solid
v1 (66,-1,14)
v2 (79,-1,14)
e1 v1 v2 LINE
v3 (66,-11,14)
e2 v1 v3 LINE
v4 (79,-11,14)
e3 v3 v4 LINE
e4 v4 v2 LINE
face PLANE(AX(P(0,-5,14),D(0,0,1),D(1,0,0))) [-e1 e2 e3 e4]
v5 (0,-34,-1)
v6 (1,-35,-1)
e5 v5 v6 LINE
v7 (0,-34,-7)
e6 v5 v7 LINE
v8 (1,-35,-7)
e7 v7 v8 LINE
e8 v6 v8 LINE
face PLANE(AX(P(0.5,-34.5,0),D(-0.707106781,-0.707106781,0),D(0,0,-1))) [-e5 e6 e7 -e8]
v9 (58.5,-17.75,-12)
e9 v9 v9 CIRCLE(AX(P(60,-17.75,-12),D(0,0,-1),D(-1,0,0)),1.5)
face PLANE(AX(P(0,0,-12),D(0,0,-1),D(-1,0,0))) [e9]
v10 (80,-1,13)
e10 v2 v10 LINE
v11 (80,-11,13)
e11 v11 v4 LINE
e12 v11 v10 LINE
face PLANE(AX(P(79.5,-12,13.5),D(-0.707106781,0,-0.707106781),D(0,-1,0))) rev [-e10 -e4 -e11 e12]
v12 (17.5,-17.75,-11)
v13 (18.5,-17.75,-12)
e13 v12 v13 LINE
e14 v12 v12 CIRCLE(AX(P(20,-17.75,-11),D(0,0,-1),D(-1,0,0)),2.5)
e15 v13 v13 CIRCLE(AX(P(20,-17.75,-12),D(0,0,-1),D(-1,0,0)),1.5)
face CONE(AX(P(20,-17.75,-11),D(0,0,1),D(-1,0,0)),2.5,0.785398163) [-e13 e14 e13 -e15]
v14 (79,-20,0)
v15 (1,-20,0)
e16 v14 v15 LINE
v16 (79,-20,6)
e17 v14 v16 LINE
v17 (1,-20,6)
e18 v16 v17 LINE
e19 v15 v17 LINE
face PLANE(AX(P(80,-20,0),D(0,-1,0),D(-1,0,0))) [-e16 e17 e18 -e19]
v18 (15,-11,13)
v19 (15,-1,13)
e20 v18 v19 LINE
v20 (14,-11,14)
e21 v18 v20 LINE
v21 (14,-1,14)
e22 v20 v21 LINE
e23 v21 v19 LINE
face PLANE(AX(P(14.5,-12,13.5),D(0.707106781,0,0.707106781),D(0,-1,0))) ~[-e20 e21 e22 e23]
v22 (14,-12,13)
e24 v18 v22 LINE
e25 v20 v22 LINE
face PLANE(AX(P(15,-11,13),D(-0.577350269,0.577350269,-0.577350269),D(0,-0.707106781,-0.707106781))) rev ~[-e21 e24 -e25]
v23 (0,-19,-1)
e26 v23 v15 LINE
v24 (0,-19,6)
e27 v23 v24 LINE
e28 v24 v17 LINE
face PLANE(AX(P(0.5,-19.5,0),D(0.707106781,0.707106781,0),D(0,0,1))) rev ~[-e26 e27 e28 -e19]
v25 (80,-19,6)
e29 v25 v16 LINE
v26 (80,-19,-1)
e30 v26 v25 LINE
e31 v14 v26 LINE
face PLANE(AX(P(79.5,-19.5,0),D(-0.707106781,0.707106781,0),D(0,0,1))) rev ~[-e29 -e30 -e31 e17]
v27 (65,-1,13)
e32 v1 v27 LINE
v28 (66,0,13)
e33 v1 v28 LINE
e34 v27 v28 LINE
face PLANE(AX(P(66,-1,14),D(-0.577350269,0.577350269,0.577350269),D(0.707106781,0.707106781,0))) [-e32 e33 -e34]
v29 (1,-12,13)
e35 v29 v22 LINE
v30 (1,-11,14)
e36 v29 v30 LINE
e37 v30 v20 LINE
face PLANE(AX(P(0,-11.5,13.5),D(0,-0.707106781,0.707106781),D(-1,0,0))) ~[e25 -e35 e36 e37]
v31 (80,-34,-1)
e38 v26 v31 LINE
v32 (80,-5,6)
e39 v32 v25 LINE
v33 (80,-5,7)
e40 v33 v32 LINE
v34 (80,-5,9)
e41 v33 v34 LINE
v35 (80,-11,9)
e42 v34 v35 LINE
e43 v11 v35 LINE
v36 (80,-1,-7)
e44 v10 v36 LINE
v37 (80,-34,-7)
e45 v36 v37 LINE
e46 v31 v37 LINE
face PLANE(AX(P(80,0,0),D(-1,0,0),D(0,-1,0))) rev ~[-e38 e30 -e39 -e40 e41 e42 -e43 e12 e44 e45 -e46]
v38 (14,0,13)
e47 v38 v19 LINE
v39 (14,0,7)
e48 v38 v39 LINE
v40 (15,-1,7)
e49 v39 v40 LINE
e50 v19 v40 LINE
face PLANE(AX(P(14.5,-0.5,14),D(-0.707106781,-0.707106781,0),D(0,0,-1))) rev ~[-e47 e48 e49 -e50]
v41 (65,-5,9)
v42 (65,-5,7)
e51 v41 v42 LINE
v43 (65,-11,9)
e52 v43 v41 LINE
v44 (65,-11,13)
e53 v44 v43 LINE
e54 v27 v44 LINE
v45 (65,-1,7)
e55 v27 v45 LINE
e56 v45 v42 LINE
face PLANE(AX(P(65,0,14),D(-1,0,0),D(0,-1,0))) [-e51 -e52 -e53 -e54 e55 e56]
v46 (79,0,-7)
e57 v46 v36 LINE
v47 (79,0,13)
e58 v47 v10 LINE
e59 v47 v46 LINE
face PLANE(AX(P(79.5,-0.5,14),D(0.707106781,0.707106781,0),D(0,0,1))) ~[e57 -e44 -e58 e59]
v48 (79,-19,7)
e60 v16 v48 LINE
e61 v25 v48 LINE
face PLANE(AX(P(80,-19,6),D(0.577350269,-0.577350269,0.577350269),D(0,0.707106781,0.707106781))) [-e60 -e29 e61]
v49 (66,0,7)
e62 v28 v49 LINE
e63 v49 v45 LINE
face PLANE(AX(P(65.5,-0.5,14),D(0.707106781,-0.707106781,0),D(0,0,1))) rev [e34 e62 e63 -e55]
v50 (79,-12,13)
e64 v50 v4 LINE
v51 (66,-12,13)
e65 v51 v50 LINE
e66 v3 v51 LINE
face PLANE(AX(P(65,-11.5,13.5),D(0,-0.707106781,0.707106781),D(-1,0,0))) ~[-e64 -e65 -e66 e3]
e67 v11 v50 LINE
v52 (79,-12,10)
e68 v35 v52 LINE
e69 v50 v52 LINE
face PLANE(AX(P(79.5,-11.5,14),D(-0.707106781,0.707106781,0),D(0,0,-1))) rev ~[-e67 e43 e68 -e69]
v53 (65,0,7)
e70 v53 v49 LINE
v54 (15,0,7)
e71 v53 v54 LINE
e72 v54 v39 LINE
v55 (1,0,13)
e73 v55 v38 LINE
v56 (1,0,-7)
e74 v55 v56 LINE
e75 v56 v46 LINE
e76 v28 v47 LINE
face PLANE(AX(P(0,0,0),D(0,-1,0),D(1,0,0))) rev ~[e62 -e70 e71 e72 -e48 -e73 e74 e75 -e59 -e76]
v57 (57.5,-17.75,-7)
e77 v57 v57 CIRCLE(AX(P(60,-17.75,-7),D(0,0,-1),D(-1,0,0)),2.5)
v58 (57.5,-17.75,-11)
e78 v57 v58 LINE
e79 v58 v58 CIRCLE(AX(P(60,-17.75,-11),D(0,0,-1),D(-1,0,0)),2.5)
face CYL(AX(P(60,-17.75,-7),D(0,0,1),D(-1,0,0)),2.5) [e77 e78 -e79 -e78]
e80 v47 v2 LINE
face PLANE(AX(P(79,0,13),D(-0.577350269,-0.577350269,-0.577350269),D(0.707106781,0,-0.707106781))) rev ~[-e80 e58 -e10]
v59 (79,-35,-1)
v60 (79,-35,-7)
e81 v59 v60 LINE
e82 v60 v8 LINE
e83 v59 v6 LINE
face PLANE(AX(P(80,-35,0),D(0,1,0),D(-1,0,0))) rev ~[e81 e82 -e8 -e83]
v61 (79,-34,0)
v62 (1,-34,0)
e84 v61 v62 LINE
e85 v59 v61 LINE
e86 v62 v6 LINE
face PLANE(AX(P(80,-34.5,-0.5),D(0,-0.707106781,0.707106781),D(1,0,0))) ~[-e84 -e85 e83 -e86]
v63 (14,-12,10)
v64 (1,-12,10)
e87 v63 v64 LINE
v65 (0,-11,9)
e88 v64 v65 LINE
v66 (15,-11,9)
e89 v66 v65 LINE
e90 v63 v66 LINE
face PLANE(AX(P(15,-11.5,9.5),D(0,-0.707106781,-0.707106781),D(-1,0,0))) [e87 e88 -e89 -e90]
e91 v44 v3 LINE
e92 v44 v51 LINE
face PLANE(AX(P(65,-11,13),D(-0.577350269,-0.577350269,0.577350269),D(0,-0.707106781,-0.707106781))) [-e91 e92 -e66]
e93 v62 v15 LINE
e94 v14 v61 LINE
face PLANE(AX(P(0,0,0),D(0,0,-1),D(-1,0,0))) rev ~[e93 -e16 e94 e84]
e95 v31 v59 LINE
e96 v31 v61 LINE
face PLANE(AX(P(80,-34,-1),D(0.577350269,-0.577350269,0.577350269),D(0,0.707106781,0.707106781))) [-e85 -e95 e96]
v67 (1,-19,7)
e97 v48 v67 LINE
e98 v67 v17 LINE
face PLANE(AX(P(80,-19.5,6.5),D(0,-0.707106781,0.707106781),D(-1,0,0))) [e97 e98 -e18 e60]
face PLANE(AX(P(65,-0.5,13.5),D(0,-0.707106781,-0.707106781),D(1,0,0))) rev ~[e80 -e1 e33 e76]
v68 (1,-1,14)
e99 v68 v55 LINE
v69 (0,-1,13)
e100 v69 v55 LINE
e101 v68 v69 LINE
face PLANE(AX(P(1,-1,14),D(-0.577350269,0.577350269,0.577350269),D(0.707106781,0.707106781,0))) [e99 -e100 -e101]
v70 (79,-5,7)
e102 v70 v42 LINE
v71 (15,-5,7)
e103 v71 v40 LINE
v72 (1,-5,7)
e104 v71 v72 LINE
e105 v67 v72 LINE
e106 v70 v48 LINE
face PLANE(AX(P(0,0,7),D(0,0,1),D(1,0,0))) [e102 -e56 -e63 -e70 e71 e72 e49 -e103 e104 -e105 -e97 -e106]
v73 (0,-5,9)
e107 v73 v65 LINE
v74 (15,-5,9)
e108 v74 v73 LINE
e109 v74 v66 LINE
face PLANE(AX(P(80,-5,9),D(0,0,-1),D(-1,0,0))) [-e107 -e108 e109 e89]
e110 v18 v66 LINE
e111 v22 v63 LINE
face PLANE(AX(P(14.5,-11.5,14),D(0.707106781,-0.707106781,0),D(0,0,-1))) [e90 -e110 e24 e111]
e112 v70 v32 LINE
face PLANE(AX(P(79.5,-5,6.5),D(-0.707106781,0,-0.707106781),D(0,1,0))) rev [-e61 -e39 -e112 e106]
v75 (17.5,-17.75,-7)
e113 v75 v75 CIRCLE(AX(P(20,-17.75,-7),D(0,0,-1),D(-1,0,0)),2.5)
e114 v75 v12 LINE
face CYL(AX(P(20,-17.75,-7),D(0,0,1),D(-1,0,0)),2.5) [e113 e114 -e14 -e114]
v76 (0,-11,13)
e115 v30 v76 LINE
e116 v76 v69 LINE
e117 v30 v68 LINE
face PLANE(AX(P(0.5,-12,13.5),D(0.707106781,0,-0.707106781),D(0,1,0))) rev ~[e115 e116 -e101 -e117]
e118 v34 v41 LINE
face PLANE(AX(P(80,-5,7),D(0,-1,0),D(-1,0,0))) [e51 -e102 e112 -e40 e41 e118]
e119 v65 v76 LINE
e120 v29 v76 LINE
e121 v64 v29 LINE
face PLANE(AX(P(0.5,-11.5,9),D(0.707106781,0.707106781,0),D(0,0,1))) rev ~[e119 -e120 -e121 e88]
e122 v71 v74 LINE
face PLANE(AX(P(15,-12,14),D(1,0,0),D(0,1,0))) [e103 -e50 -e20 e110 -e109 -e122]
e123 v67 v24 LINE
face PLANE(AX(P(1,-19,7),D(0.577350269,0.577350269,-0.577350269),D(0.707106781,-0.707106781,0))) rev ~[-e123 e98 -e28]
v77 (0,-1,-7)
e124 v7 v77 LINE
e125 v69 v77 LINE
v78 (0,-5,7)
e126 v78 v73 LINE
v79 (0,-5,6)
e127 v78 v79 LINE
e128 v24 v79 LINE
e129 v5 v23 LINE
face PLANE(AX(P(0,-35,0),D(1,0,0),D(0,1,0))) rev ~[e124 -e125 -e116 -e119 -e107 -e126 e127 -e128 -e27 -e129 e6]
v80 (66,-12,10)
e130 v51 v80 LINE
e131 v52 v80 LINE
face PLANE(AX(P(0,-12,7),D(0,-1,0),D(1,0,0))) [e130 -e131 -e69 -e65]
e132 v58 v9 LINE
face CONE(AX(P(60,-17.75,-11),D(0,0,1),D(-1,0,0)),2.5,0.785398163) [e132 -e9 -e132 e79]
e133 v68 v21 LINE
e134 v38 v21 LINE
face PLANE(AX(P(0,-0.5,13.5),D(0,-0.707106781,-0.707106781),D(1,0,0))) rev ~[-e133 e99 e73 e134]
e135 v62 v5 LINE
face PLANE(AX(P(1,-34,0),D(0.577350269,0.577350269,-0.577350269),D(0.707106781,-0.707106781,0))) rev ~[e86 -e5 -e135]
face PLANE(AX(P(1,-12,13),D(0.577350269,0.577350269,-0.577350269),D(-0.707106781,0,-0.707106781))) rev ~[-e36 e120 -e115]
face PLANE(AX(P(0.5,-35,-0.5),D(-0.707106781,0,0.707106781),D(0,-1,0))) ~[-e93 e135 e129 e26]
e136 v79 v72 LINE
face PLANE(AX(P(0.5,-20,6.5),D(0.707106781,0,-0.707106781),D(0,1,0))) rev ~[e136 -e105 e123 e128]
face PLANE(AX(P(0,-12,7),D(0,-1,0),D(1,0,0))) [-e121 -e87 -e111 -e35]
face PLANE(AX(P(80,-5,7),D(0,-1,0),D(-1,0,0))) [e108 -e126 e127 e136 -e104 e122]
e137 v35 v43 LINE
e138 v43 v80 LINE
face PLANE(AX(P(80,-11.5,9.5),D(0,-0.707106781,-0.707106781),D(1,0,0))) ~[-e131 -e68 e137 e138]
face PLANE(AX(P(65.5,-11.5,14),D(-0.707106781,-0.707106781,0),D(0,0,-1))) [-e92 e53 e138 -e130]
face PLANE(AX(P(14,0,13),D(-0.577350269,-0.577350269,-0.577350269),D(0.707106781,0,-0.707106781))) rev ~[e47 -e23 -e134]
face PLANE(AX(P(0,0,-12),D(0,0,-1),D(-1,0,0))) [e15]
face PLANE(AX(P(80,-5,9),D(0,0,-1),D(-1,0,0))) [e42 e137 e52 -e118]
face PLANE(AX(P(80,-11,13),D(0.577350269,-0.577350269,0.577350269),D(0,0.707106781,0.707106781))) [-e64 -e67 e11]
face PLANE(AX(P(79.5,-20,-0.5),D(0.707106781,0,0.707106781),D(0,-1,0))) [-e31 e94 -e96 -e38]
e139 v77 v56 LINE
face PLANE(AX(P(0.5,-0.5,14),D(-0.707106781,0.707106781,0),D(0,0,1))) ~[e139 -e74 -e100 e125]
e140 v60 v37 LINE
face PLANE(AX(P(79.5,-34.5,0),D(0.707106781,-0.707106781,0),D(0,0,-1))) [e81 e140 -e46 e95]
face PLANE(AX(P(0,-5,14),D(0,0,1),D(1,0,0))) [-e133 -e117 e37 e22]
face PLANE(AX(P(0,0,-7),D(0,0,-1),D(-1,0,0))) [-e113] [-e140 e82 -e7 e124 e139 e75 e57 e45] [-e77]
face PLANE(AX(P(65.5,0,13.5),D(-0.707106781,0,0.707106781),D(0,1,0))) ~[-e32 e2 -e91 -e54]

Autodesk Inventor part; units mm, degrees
ref_plane "YZ Plane" through (0, 0, 0) normal (1, 0, 0) x (0, 1, 0)
ref_plane "XZ Plane" through (0, 0, 0) normal (0, 1, 0) x (-1, 0, 0)
ref_plane "XY Plane" through (0, 0, 0) normal (0, 0, 1) x (1, 0, 0)
sketch "Sketch1" plane through (0, 0, 0) normal (0, 0, 1) x (1, 0, 0)
  line L0 (0, 0) -> (80, 0)
  line L1 (80, 0) -> (80, -20)
  line L2 (80, -20) -> (0, -20)
  line L3 (0, -20) -> (0, 0)
  dimension "d0" = 80
  dimension "d1" = 20
extrude "Extrusion1" add sketch "Sketch1" along normal blind 7
sketch "Sketch2" plane through (0, 0, 7) normal (0, 0, 1) x (1, 0, 0)
  line L0 (0, 0) -> (80, 0)
  line L1 (80, 0) -> (80, -5)
  line L2 (80, -5) -> (0, -5)
  line L3 (0, -5) -> (0, 0)
  dimension "d4" = 80
  dimension "d5" = 5
extrude "Extrusion2" add sketch "Sketch2" along normal blind 7
sketch "Sketch3" plane through (0, -5, 7) normal (0, -1, 0) x (1, 0, 0)
  line L0 (0, -7) -> (0, 7) projected
  line L1 (0, 7) -> (80, 7)
  line L2 (80, 7) -> (80, 2)
  line L3 (80, 2) -> (0, 2)
  line L4 (0, 2) -> (0, 7)
  dimension "d8" = 80
  dimension "d9" = 5
extrude "Extrusion3" add sketch "Sketch3" along normal blind 7
sketch "Sketch6" plane through (0, 0, 14) normal (0, 0, 1) x (1, 0, 0)
  line L0 (80, 0) -> (0, 0) projected
  line L1 (1, -12) -> (79, -12) projected
  line L2 (15, 0) -> (65, 0)
  line L3 (65, 0) -> (65, -12)
  line L4 (65, -12) -> (15, -12)
  line L5 (15, -12) -> (15, 0)
  line L6 (0, -1) -> (0, -11) projected
  point P0 (79, 0)
  point P1 (1, 0)
  dimension "d28" = 50
  dimension "d29" = 15
extrude "Extrusion6" cut sketch "Sketch6" against normal blind 7
sketch "Sketch7" plane through (0, 0, 0) normal (0, 0, -1) x (-1, 0, 0)
  line L0 (0, 0) -> (-80, 0)
  line L1 (-80, 0) -> (-80, -35)
  line L2 (-80, -35) -> (0, -35)
  line L3 (0, -35) -> (0, 0)
  dimension "d38" = 80
  dimension "d39" = 35
extrude "Extrusion7" add sketch "Sketch7" along normal blind 7
sketch "Sketch8" plane through (0, 0, -7) normal (0, 0, -1) x (-1, 0, 0)
  circle A0 centre (-20, -17.75) radius 2.5
  line L0 (0, 0) -> (-80, 0) projected
  line L1 (0, -35) -> (0, 0) projected
  dimension "d42" = 5
  dimension "d43" = 17.75
  dimension "d44" = 20
extrude "Extrusion8" add sketch "Sketch8" along normal blind 5
sketch "Sketch9" plane through (0, 0, -7) normal (0, 0, -1) x (-1, 0, 0)
  circle A0 centre (-60, -17.75) radius 2.5
  line L0 (0, 0) -> (-80, 0) projected
  line L1 (-80, 0) -> (-80, -35) projected
  dimension "d47" = 5
  dimension "d48" = 17.75
  dimension "d49" = 20
extrude "Extrusion9" add sketch "Sketch9" along normal blind 5
chamfer "Chamfer5" distance 1 angle 45 30 edges at (0, -35, -3.5) (0, -27.5, 0) (0, -20, 3.5) (0, -12.5, 7) (40, -20, 7) (40, -35, 0) (0, 0, 3.5) (22.5, -17.75, -12) (62.5, -17.75, -12) (0, -6, 14) (72.5, -12, 14) (7.5, -12, 14) (15, -6, 14) (7.5, 0, 14) (7.5, -12, 9) (0, -12, 11.5) (15, -12, 11.5) (65, 0, 10.5) (65, -6, 14) (65, -12, 11.5) (72.5, -12, 9) (80, -12, 11.5) (80, -6, 14) (72.5, 0, 14) (80, 0, 3.5) (80, -35, -3.5) (80, -27.5, 0) (80, -20, 3.5) (80, -12.5, 7) (15, 0, 10.5)
properties part number "euro_box_center"
